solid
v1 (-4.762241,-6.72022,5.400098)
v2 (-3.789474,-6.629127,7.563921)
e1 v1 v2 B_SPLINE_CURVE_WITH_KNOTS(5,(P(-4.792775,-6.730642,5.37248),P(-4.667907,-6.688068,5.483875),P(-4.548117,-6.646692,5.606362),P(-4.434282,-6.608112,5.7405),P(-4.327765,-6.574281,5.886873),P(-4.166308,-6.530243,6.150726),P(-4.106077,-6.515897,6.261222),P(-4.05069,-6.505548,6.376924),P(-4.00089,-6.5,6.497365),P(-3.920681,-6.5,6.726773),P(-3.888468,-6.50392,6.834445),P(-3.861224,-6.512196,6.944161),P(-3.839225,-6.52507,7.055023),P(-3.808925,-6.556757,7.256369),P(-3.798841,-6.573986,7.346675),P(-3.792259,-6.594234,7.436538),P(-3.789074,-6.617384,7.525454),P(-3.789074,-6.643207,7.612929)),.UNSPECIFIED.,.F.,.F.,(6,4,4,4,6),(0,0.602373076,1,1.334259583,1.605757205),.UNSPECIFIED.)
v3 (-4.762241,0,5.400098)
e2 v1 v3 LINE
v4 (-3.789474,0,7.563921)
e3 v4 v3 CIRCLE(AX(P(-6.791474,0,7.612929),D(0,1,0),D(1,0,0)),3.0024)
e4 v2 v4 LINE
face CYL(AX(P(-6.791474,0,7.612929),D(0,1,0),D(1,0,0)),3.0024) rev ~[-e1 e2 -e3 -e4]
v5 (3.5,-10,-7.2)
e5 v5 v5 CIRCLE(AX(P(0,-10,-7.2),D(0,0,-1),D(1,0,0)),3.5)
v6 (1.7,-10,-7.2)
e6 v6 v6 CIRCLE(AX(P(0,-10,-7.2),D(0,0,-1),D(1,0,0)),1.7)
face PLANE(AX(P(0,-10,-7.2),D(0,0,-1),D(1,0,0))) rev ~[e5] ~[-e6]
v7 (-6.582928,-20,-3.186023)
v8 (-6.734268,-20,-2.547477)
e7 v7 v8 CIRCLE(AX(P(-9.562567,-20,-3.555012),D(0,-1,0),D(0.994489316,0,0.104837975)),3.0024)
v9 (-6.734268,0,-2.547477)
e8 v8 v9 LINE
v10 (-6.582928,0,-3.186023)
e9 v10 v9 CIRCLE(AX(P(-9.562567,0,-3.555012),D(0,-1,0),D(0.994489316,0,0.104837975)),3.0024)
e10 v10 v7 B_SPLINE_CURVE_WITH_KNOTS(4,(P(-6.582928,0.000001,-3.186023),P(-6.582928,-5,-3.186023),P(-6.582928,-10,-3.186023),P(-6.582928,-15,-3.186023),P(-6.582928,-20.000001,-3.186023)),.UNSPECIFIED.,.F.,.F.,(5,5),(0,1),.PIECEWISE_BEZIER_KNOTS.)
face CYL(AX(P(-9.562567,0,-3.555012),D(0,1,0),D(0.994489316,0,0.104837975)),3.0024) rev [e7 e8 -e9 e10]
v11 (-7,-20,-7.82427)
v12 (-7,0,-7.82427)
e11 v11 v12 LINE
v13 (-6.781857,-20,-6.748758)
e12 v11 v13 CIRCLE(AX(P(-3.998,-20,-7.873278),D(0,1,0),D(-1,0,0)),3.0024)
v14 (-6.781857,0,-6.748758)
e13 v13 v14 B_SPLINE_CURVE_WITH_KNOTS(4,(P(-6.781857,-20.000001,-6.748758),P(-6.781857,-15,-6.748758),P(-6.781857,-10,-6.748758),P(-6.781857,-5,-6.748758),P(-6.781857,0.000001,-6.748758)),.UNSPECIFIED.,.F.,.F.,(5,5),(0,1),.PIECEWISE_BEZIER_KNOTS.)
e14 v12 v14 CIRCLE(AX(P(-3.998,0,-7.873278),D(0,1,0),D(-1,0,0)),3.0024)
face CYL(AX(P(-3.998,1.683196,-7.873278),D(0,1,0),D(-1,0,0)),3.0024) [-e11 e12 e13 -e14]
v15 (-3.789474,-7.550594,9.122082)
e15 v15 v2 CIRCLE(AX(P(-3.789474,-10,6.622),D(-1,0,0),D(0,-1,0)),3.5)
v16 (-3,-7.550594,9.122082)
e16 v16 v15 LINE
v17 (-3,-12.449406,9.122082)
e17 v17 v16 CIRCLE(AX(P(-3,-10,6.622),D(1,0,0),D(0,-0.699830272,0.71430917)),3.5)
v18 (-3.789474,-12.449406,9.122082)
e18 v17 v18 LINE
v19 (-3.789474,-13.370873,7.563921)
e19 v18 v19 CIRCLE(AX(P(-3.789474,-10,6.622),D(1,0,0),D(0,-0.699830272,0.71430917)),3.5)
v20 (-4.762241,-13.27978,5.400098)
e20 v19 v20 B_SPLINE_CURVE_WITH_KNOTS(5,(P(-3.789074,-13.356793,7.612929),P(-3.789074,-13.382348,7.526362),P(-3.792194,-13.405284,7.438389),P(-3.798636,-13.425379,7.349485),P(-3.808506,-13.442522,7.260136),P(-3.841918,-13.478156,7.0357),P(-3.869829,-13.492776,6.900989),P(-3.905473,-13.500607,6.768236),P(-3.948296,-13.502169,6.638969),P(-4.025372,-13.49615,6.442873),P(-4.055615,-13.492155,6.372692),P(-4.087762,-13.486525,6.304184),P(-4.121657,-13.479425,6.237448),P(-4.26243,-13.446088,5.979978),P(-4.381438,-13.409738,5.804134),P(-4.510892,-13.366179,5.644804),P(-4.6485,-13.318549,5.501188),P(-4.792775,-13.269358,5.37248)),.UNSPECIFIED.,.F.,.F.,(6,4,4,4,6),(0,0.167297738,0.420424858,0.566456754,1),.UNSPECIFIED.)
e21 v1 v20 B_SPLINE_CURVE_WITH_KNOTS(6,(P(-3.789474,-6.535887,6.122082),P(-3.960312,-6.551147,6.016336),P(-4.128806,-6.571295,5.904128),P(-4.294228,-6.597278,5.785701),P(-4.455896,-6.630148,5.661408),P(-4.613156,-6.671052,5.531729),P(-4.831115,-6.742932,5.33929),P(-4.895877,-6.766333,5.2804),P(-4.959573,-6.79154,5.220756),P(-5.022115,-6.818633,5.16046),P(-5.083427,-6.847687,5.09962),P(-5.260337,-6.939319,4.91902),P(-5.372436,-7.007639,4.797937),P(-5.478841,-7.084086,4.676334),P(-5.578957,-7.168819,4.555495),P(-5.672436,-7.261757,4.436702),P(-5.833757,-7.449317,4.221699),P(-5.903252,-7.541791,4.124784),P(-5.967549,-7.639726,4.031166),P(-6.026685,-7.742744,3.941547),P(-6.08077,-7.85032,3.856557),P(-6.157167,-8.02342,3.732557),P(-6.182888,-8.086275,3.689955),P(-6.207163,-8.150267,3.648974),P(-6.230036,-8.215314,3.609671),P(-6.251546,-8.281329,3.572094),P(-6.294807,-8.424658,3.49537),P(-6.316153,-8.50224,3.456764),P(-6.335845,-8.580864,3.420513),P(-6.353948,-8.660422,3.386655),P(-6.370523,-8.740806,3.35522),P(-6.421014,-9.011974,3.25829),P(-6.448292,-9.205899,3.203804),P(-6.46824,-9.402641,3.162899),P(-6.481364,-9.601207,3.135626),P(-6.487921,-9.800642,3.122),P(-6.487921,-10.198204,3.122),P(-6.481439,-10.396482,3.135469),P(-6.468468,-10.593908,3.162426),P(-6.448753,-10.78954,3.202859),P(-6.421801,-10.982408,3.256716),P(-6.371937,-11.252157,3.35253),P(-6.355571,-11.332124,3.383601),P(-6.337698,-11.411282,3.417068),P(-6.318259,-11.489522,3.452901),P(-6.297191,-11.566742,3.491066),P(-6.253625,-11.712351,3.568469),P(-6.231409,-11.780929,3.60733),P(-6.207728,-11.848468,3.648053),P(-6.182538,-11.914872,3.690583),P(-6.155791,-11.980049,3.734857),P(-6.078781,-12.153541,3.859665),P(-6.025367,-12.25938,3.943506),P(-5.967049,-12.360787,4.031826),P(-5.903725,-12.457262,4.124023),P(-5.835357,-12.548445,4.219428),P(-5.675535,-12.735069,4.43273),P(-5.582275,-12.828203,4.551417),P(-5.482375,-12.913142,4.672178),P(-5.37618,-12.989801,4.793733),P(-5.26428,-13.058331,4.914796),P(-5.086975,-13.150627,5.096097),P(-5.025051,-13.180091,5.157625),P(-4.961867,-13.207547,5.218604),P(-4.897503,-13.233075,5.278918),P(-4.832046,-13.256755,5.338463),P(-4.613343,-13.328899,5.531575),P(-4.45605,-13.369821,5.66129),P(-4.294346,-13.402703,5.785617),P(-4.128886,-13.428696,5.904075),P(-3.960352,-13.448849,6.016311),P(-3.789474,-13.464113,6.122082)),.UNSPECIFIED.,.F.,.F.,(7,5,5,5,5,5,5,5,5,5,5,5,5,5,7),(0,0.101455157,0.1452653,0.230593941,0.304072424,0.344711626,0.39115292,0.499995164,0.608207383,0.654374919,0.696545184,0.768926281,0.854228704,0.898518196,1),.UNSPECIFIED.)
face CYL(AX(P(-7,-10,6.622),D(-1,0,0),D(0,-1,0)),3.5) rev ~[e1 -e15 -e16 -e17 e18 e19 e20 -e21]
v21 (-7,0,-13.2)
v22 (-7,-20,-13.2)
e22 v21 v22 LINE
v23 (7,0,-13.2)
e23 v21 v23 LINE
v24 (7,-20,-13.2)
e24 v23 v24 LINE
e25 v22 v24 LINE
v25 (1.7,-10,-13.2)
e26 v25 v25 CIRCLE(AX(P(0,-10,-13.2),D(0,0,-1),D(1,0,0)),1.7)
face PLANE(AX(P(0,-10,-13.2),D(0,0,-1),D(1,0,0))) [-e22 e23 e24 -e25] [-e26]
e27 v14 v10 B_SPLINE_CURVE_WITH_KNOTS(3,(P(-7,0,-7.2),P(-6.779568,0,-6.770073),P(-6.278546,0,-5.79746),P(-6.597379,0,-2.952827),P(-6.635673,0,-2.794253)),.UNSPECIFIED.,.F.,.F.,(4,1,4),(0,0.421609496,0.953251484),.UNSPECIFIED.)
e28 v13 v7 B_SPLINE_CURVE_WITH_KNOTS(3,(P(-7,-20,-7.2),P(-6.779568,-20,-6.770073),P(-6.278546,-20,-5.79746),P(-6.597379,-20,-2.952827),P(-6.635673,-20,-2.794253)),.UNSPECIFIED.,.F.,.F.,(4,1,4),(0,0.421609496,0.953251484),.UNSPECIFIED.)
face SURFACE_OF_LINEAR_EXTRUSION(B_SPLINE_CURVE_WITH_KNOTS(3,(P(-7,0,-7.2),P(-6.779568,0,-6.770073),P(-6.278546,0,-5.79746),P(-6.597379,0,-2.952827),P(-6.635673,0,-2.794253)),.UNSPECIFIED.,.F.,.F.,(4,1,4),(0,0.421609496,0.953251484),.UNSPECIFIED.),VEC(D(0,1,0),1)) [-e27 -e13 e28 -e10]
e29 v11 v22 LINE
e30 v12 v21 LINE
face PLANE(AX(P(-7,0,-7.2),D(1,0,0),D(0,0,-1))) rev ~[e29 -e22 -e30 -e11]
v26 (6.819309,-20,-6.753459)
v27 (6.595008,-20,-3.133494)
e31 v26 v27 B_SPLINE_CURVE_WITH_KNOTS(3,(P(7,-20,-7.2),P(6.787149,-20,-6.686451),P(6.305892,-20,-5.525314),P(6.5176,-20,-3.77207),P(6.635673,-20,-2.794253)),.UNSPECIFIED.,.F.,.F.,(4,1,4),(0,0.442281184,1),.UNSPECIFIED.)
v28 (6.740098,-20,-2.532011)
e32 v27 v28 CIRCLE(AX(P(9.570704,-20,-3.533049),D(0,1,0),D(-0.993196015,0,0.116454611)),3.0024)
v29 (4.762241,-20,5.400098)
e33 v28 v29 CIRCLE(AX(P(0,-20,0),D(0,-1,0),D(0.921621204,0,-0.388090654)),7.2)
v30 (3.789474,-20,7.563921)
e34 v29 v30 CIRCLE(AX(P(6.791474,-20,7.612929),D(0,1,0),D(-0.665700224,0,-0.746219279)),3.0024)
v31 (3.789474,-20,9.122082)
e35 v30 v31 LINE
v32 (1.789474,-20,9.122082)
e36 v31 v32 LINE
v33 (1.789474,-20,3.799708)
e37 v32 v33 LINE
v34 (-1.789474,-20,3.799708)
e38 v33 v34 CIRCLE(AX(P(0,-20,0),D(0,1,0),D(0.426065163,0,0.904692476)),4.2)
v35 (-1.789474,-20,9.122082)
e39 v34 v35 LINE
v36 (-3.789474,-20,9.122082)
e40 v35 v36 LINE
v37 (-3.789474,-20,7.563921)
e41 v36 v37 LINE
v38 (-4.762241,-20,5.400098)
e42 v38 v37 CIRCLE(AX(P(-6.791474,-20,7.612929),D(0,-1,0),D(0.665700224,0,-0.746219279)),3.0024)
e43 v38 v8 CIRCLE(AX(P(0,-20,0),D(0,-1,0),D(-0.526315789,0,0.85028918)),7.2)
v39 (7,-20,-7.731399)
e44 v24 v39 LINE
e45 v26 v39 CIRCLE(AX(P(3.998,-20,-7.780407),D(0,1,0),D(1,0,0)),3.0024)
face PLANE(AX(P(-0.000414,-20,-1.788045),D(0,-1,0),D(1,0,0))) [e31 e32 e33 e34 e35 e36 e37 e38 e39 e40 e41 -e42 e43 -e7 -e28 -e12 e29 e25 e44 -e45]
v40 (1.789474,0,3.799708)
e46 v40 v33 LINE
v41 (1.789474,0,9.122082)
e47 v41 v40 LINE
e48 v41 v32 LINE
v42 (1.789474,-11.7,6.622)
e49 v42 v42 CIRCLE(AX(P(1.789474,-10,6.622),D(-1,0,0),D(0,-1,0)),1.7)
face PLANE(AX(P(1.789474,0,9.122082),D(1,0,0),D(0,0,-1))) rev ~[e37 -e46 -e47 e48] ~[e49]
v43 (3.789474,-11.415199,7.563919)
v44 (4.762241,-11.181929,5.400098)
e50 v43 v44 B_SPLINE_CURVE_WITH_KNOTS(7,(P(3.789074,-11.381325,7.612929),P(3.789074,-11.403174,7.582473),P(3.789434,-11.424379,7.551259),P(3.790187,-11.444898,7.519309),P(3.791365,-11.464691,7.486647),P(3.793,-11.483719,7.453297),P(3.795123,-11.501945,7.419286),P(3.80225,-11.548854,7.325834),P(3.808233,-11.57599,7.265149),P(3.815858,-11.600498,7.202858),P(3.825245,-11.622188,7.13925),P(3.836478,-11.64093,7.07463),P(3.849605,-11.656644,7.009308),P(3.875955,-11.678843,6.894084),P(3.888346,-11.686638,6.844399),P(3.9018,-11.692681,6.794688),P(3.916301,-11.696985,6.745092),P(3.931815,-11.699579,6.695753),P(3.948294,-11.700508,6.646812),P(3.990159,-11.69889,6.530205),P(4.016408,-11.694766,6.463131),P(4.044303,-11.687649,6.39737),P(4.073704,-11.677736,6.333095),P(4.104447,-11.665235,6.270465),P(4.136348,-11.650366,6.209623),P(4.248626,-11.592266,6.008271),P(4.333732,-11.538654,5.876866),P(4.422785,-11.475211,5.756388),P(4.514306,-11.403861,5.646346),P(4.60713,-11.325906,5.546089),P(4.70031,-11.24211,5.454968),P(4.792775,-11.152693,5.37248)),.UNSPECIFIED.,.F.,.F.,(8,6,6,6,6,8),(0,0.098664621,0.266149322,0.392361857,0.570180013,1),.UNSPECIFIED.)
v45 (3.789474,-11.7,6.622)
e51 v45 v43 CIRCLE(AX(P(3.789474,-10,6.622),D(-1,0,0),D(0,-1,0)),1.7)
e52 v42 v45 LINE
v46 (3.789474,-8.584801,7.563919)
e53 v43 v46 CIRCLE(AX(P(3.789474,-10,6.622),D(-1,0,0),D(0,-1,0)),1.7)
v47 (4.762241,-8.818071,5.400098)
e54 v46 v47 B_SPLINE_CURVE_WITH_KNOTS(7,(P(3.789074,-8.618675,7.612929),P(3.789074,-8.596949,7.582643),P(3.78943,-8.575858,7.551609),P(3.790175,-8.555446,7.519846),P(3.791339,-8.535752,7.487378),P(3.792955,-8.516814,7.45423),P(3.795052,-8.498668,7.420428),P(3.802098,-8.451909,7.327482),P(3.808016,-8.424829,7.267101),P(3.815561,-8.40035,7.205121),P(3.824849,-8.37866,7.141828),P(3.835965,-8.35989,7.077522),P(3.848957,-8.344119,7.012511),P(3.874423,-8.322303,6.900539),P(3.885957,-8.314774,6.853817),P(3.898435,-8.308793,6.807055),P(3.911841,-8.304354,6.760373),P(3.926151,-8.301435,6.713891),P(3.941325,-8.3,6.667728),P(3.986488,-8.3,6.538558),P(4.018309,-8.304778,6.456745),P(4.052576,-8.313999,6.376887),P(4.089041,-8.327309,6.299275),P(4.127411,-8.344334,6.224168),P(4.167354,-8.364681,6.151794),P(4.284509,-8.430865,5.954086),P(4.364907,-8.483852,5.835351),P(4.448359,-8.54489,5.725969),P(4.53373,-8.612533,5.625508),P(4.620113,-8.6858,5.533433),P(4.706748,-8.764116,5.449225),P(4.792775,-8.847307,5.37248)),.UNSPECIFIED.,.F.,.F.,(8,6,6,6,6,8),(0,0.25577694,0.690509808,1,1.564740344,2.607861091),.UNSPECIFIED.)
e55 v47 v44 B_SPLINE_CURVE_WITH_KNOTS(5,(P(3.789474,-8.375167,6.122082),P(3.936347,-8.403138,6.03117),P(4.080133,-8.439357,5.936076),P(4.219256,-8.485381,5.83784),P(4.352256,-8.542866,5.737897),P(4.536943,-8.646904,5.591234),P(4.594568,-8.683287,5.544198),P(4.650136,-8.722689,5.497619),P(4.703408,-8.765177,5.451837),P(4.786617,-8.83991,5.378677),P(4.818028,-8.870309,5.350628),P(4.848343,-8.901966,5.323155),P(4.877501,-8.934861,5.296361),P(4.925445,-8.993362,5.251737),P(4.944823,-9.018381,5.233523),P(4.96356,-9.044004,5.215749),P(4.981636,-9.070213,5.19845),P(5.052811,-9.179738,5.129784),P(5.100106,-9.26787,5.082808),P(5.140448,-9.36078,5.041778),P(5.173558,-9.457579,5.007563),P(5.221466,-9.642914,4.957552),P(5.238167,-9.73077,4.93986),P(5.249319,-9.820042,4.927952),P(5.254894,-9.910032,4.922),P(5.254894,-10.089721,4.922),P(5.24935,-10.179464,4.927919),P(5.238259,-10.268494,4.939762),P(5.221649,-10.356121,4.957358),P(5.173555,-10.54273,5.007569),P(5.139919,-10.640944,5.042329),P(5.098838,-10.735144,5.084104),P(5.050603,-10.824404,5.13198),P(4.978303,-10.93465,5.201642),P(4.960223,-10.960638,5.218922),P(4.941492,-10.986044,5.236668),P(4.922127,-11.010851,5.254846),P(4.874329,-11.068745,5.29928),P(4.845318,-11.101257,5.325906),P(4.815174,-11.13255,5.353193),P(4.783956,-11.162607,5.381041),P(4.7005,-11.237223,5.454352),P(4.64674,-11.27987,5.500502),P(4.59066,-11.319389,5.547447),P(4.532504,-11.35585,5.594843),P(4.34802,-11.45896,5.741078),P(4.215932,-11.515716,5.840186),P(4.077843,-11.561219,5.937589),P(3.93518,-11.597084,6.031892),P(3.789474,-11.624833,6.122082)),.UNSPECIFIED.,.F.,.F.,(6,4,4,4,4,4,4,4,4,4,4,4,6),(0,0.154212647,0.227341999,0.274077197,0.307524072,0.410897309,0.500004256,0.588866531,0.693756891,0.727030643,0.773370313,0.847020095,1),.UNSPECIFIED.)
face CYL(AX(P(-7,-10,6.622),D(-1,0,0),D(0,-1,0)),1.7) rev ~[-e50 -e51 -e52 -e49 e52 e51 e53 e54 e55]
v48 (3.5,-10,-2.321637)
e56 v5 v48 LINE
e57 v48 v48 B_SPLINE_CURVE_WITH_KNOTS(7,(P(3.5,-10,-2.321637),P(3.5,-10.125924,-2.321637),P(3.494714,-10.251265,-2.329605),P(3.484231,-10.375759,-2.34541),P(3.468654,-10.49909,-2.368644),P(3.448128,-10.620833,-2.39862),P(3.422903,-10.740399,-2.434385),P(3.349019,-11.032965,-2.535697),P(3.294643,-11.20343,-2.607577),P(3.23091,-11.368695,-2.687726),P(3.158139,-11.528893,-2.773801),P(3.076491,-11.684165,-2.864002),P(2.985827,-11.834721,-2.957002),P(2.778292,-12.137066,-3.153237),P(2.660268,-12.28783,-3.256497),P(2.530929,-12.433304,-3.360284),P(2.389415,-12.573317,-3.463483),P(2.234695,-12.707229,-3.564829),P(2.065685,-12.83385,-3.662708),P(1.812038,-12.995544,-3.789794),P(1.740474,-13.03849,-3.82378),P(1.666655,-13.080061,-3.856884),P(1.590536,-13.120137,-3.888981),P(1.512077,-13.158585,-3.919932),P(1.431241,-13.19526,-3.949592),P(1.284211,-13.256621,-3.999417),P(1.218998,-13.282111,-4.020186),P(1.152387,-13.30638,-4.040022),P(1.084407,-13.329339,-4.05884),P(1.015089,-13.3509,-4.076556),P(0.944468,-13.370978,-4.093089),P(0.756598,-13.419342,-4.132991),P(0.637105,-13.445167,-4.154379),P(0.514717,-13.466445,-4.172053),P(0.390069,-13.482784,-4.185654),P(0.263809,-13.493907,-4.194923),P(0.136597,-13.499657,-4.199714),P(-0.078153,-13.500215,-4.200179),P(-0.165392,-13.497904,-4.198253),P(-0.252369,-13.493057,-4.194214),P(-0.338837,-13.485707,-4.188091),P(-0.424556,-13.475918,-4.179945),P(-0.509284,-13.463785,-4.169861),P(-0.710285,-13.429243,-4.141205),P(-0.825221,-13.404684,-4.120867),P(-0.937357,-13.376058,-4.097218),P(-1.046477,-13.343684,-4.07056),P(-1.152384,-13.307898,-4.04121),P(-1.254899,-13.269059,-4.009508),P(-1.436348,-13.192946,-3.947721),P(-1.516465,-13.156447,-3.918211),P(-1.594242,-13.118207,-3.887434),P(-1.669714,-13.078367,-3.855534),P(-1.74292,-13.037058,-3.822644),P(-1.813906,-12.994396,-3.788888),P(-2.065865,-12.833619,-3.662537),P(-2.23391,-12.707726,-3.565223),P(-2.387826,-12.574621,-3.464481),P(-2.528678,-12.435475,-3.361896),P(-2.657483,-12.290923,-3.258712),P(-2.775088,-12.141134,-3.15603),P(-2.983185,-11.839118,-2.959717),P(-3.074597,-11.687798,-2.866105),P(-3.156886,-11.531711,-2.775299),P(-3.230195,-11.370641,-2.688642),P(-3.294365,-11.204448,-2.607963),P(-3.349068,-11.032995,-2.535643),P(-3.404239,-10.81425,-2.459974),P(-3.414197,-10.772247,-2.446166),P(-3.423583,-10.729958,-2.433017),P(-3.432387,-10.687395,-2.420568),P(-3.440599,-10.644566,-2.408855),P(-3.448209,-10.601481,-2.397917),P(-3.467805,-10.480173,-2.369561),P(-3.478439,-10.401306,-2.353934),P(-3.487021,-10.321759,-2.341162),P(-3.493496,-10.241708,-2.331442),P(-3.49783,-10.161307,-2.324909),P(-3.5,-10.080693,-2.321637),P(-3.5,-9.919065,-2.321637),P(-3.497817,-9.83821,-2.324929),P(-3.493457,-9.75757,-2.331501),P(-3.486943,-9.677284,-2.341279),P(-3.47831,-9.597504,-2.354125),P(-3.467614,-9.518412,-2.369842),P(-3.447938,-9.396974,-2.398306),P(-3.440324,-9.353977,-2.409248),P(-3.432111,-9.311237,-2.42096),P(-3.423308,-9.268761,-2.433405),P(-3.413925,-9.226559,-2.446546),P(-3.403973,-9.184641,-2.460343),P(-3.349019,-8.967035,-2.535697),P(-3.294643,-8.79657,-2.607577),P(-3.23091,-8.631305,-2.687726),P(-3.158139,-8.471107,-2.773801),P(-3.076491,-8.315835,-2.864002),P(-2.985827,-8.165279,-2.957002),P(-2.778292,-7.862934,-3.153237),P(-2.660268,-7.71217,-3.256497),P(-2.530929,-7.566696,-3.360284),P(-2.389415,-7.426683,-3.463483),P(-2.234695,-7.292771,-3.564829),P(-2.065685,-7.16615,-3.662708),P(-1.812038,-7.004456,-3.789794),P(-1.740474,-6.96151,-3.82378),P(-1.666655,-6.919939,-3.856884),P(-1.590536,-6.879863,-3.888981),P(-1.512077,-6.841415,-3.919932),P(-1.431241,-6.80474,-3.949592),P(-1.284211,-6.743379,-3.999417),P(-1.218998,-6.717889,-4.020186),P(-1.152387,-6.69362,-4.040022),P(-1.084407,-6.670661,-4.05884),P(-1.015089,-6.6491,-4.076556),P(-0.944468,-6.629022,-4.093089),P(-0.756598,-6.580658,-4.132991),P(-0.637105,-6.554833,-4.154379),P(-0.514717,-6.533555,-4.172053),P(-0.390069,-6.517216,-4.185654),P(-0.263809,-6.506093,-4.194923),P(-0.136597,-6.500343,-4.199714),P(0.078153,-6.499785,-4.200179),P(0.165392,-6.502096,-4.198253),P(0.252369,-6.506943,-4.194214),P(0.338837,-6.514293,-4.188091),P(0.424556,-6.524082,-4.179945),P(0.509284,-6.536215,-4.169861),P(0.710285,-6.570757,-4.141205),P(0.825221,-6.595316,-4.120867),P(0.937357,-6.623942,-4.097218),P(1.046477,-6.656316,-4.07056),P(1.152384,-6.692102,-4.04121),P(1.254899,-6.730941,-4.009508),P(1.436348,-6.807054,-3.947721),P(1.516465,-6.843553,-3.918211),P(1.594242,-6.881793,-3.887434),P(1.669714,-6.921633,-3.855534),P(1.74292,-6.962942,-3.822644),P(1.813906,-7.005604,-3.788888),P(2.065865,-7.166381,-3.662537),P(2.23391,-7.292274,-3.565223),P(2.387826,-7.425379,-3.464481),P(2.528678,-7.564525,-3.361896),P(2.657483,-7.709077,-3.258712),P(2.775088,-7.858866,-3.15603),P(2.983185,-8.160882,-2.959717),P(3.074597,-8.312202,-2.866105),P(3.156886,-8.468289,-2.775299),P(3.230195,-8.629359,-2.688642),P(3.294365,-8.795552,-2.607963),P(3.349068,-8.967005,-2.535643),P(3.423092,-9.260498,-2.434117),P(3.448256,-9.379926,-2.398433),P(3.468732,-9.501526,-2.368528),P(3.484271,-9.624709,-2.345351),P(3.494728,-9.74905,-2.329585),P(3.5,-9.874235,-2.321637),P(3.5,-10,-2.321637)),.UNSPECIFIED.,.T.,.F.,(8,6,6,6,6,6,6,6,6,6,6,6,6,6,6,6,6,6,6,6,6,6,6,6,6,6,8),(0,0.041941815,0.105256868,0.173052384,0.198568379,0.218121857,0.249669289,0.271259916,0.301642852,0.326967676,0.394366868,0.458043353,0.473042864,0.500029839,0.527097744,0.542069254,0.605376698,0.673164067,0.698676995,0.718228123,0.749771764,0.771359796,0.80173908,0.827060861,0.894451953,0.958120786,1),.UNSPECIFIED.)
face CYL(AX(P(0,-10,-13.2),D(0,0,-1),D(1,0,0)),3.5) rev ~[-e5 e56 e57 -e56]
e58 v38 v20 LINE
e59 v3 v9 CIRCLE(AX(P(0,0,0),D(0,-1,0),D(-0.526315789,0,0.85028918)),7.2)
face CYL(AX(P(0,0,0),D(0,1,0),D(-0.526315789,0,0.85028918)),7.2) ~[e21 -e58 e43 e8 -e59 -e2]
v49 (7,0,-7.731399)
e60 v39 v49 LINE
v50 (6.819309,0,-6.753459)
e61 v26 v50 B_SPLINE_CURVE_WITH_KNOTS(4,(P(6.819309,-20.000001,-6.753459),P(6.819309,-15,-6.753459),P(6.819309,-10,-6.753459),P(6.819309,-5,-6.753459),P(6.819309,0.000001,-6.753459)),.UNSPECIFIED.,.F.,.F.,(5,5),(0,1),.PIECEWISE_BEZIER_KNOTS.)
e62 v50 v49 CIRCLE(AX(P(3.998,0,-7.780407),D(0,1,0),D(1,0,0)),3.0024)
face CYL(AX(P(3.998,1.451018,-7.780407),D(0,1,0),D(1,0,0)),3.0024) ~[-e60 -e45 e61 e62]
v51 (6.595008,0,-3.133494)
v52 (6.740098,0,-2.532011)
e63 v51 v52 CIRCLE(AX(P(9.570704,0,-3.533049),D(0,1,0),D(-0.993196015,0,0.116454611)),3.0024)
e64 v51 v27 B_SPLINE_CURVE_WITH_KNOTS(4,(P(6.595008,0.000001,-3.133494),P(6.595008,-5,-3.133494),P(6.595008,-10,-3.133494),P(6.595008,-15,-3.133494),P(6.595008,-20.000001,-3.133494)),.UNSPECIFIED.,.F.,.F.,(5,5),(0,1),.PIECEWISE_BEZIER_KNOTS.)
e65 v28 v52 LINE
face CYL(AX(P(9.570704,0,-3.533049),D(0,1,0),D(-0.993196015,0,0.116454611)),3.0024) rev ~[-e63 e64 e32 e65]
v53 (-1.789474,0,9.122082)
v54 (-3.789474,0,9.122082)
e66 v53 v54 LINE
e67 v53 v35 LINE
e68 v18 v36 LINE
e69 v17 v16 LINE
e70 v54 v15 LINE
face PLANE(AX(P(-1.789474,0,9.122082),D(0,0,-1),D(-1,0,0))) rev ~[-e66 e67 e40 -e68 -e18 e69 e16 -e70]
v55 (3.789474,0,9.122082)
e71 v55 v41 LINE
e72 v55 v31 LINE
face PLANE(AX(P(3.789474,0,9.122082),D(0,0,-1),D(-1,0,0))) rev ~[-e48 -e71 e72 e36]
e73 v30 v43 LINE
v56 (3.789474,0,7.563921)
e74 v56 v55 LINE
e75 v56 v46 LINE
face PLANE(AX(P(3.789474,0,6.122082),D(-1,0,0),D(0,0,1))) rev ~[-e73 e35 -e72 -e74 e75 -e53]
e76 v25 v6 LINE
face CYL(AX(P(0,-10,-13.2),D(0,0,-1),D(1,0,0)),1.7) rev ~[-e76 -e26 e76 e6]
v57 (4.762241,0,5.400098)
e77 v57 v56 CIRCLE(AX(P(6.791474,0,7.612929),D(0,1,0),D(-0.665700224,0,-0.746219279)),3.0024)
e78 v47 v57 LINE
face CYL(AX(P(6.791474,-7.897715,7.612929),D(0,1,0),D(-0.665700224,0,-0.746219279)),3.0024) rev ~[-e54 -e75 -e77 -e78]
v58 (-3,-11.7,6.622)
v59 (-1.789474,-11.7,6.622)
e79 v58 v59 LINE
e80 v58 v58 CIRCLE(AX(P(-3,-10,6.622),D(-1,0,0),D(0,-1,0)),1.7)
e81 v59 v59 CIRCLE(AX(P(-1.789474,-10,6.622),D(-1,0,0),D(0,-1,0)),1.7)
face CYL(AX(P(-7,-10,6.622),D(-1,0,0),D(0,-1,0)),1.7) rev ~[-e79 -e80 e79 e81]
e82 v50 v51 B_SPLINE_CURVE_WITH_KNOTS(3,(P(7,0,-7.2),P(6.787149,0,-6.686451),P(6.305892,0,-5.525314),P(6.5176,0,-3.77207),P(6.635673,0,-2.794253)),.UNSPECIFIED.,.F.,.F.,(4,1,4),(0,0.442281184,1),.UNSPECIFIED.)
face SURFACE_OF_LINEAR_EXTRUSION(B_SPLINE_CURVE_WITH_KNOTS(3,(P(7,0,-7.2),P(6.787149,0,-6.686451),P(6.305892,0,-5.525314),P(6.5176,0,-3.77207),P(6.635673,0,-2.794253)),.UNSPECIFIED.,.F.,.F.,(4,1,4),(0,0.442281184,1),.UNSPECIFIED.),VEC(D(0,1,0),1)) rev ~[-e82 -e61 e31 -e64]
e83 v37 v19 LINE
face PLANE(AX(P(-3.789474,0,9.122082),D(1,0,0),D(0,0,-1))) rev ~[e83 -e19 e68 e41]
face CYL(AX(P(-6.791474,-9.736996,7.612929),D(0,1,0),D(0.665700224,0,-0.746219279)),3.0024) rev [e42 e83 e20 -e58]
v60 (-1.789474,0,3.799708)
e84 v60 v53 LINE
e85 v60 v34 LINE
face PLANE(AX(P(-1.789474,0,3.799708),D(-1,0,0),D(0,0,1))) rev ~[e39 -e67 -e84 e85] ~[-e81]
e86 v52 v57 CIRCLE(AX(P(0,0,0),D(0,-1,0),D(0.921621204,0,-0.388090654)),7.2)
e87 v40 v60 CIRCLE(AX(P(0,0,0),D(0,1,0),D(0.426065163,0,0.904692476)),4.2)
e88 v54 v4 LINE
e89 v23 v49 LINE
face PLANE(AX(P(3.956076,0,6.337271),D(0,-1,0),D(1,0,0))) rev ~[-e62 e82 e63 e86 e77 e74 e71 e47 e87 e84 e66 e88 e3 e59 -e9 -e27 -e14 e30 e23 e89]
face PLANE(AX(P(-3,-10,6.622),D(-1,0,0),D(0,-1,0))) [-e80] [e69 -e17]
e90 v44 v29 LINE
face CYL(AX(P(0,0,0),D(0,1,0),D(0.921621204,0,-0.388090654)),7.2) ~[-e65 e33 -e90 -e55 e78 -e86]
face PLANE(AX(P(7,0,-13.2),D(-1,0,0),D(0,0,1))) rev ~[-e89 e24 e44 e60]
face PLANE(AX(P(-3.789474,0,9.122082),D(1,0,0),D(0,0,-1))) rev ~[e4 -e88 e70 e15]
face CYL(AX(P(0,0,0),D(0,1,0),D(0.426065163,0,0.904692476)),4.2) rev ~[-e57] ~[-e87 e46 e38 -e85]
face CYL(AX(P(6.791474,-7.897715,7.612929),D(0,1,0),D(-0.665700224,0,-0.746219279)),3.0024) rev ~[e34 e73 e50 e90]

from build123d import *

# Parameters (mm, degrees)
F1_DEPTH     = 20
F2_R         = 3.5
F2_R_2       = 1.7
F3_DEPTH     = 4
F4_DEPTH     = 25
F5_T1_DEPTH  = 20
F5_T6_DEPTH  = 12.1022846539
F5_S7_R      = 1.7
F5_T8_DEPTH  = 8
F5_T12_DEPTH = 12.1022846539
F5_S13_R     = 1.7
F5_T14_DEPTH = 8
F5_T18_DEPTH = 10.2630041323
F5_S19_R     = 3.5
F5_T20_DEPTH = 7
F5_T24_DEPTH = 10.2630041323
F5_S25_R     = 3.5
F5_T26_DEPTH = 7
F5_T27_DEPTH = 23.3663915102
F5_T29_DEPTH = 22.9020360067
F6_R         = 3.5
F6_R_2       = 1.7
F7_DEPTH     = 12
F8_DEPTH     = 12
F9_DEPTH     = 6


# Not quite as in the source:
# - a fillet or chamfer that OpenCascade refuses, or shapes differently, is made with other operations: its cross-section is extruded or revolved along the edge and cut away or added


with BuildPart() as f1:
    # F0 (on Front) → F1 (new body)
    with BuildSketch(Plane.XZ):
        with BuildLine():
            ThreePointArc((1.7894736842, 3.7997084011), (0, -4.2), (-1.7894736842, 3.7997084011))
            Line((-1.7894736842, 3.7997084011), (-1.7894736842, 9.1220820965))
            Line((-1.7894736842, 9.1220820965), (-3.7894736842, 9.1220820965))
            Line((-3.7894736842, 9.1220820965), (-3.7894736842, 6.1220820965))
            ThreePointArc((-3.7894736842, 6.1220820965), (-6.8557776995, 2.199616361), (-6.6439040907, -2.7746240166))
            add(Edge.make_bspline(
                [(-6.6356726702, -2.7942527112), (-6.6390399212, -2.7803089062), (-6.6413283577, -2.7774058988), (-6.6439040907, -2.7746240166)],
                knots=[0.9532514843, 0.9532514843, 0.9532514843, 0.9532514843, 1, 1, 1, 1], degree=3))
            add(Edge.make_bspline(
                [(-7, -7.2), (-6.7795680226, -6.7700727801), (-6.2785456929, -5.7974600377), (-6.5973790049, -2.9528269921), (-6.6356726702, -2.7942527112)],
                knots=[0, 0, 0, 0, 0.4216094964, 0.9532514843, 0.9532514843, 0.9532514843, 0.9532514843], degree=3))
            Line((-7, -7.2), (-7, -13.2))
            Line((-7, -13.2), (7, -13.2))
            Line((7, -13.2), (7, -7.2))
            add(Edge.make_bspline(
                [(7, -7.2), (6.7871491537, -6.6864508711), (6.3058923114, -5.5253136877), (6.5175995563, -3.7720698099), (6.6356726702, -2.7942527112)],
                knots=[0, 0, 0, 0, 0.4422811845, 1, 1, 1, 1], degree=3))
            ThreePointArc((6.6356726702, -2.7942527112), (6.8590214848, 2.1894803656), (3.7894736842, 6.1220820965))
            Line((3.7894736842, 6.1220820965), (3.7894736842, 9.1220820965))
            Line((3.7894736842, 9.1220820965), (1.7894736842, 9.1220820965))
            Line((1.7894736842, 9.1220820965), (1.7894736842, 3.7997084011))
        make_face()
        with BuildLine():
            add(Edge.make_bspline(
                [(-6.6356726702, -2.7942527112), (-6.6390399212, -2.7803089062), (-6.6413283577, -2.7774058988), (-6.6439040907, -2.7746240166)],
                knots=[0.9532514843, 0.9532514843, 0.9532514843, 0.9532514843, 1, 1, 1, 1], degree=3))
            ThreePointArc((-6.6439040907, -2.7746240166), (-6.6397956338, -2.7844414056), (-6.6356726702, -2.7942527112))
        make_face()
    extrude(amount=F1_DEPTH)

    # F2 (on face) → F3 (cut)
    with BuildSketch(Plane(origin=(-7, 0, 0), x_dir=(0, -1, 0), z_dir=(-1, 0, 0))):
        with Locations((10, 6.622)):
            Circle(F2_R)
        with Locations((10, 6.622)):
            Circle(F2_R_2, mode=Mode.SUBTRACT)
    extrude(amount=-F3_DEPTH, mode=Mode.SUBTRACT)

    # F2 (on face) → F4 (cut)
    with BuildSketch(Plane(origin=(-7, 0, 0), x_dir=(0, -1, 0), z_dir=(-1, 0, 0))):
        with Locations((10, 6.622)):
            Circle(F2_R_2)
    extrude(amount=-F4_DEPTH, mode=Mode.SUBTRACT)

    # F5: fillet of radius 3 on 8 edges, made by hand

    # F5_s2 → F5_t1 (join)
    with BuildSketch(Plane.XZ):
        with BuildLine():
            ThreePointArc((-6.5767127025, -3.2402461743), (-6.6395606645, -2.8691274316), (-6.7483493849, -2.5087886996))
            Line((-6.7483493849, -2.5087886996), (-6.466927581, -2.4041663985))
            ThreePointArc((-6.466927581, -2.4041663985), (-6.4145893512, -2.5416001874), (-6.3589651198, -2.6777323732))
            Line((-6.3589651198, -2.6777323732), (-6.343821894, -2.723774473))
            ThreePointArc((-6.343821894, -2.723774473), (-6.304537605, -2.9799785061), (-6.2781272304, -3.2087696206))
            Line((-6.2781272304, -3.2087696206), (-6.5767127025, -3.2402461743))
        make_face()
        with BuildLine():
            ThreePointArc((6.5887317904, -3.1834061265), (6.6509501418, -2.8334452349), (6.754091056, -2.4932898281))
            Line((6.754091056, -2.4932898281), (6.4724298111, -2.3893138658))
            ThreePointArc((6.4724298111, -2.3893138658), (6.4175024363, -2.534235691), (6.3589651198, -2.6777323732))
            Line((6.3589651198, -2.6777323732), (6.3375979172, -2.7582596669))
            ThreePointArc((6.3375979172, -2.7582596669), (6.3141276632, -2.9530960278), (6.290534619, -3.1484417941))
            Line((6.290534619, -3.1484417941), (6.5887317904, -3.1834061265))
        make_face()
    extrude(amount=F5_T1_DEPTH)


with BuildPart() as f5_tool4:
    # F5_s5 → F5_t6 (new body)
    with BuildSketch(Plane.XZ.offset(7.8977153461)):
        with BuildLine():
            ThreePointArc((4.792775332, 5.3724803189), (4.0514647707, 6.385428811), (3.7890736842, 7.6129290813))
            Line((3.7890736842, 7.6129290813), (3.4888336842, 7.6129290813))
            ThreePointArc((3.4888336842, 7.6129290813), (3.4892336842, 6.8675055889), (3.4892336842, 6.1220820965))
            Line((3.4892336842, 6.1220820965), (3.6314526316, 5.8667912731))
            ThreePointArc((3.6314526316, 5.8667912731), (4.1279416848, 5.5287236777), (4.5929054968, 5.1484354427))
            Line((4.5929054968, 5.1484354427), (4.792775332, 5.3724803189))
        make_face()
    extrude(amount=F5_T6_DEPTH)

    # F5_s7 → F5_t8 (cut, symmetric)
    with BuildSketch(Plane.YZ.offset(4.1)):
        with Locations((-10, 6.622)):
            Circle(F5_S7_R)
    extrude(amount=F5_T8_DEPTH, both=True, mode=Mode.SUBTRACT)


with BuildPart() as f1_1:
    add(f1.part)

    # F5_t3: union F5_tool4
    add(f5_tool4.part)


with BuildPart() as f5_tool10:
    # F5_s11 → F5_t12 (new body)
    with BuildSketch(Plane.XZ):
        with BuildLine():
            ThreePointArc((4.792775332, 5.3724803189), (4.0514647707, 6.385428811), (3.7890736842, 7.6129290813))
            Line((3.7890736842, 7.6129290813), (3.4888336842, 7.6129290813))
            ThreePointArc((3.4888336842, 7.6129290813), (3.4892336842, 6.8675055889), (3.4892336842, 6.1220820965))
            Line((3.4892336842, 6.1220820965), (3.6314526316, 5.8667912731))
            ThreePointArc((3.6314526316, 5.8667912731), (4.1279416848, 5.5287236777), (4.5929054968, 5.1484354427))
            Line((4.5929054968, 5.1484354427), (4.792775332, 5.3724803189))
        make_face()
    extrude(amount=F5_T12_DEPTH)

    # F5_s13 → F5_t14 (cut, symmetric)
    with BuildSketch(Plane.YZ.offset(4.1)):
        with Locations((-10, 6.622)):
            Circle(F5_S13_R)
    extrude(amount=F5_T14_DEPTH, both=True, mode=Mode.SUBTRACT)


with BuildPart() as f1_2:
    add(f1_1.part)

    # F5_t9: union F5_tool10
    add(f5_tool10.part)


with BuildPart() as f5_tool16:
    # F5_s17 → F5_t18 (new body)
    with BuildSketch(Plane.XZ):
        with BuildLine():
            ThreePointArc((-3.7890736842, 7.6129290813), (-4.0514647707, 6.385428811), (-4.792775332, 5.3724803189))
            Line((-4.792775332, 5.3724803189), (-4.5929054968, 5.1484354427))
            ThreePointArc((-4.5929054968, 5.1484354427), (-4.1279416848, 5.5287236777), (-3.6314526316, 5.8667912731))
            Line((-3.6314526316, 5.8667912731), (-3.4892336842, 6.1220820965))
            ThreePointArc((-3.4892336842, 6.1220820965), (-3.4892336842, 6.8675055889), (-3.4888336842, 7.6129290813))
            Line((-3.4888336842, 7.6129290813), (-3.7890736842, 7.6129290813))
        make_face()
    extrude(amount=F5_T18_DEPTH)

    # F5_s19 → F5_t20 (cut, symmetric)
    with BuildSketch(Plane.YZ.offset(-4.1)):
        with Locations((-10, 6.622)):
            Circle(F5_S19_R)
    extrude(amount=F5_T20_DEPTH, both=True, mode=Mode.SUBTRACT)


with BuildPart() as f1_3:
    add(f1_2.part)

    # F5_t15: union F5_tool16
    add(f5_tool16.part)


with BuildPart() as f5_tool22:
    # F5_s23 → F5_t24 (new body)
    with BuildSketch(Plane.XZ.offset(9.7369958677)):
        with BuildLine():
            ThreePointArc((-4.792775332, 5.3724803189), (-4.0514647707, 6.385428811), (-3.7890736842, 7.6129290813))
            Line((-3.7890736842, 7.6129290813), (-3.4888336842, 7.6129290813))
            ThreePointArc((-3.4888336842, 7.6129290813), (-3.4892336842, 6.8675055889), (-3.4892336842, 6.1220820965))
            Line((-3.4892336842, 6.1220820965), (-3.6314526316, 5.8667912731))
            ThreePointArc((-3.6314526316, 5.8667912731), (-4.1279416848, 5.5287236777), (-4.5929054968, 5.1484354427))
            Line((-4.5929054968, 5.1484354427), (-4.792775332, 5.3724803189))
        make_face()
    extrude(amount=F5_T24_DEPTH)

    # F5_s25 → F5_t26 (cut, symmetric)
    with BuildSketch(Plane.YZ.offset(-4.1)):
        with Locations((-10, 6.622)):
            Circle(F5_S25_R)
    extrude(amount=F5_T26_DEPTH, both=True, mode=Mode.SUBTRACT)


with BuildPart() as f1_4:
    add(f1_3.part)

    # F5_t21: union F5_tool22
    add(f5_tool22.part)

    # F5_s28 → F5_t27 (cut)
    with BuildSketch(Plane.XZ.offset(-1.6831957551)):
        with BuildLine():
            ThreePointArc((-7.0004, -7.8732781832), (-6.9416848839, -7.2824101234), (-6.7678360085, -6.7146521667))
            Line((-6.7678360085, -6.7146521667), (-7.0448196093, -6.5987895651))
            ThreePointArc((-7.0448196093, -6.5987895651), (-7.148871707, -6.8283644641), (-7.2671697753, -7.0630169034))
            Line((-7.2671697753, -7.0630169034), (-7.30024, -7.2))
            ThreePointArc((-7.30024, -7.2), (-7.30024, -7.5366390916), (-7.30064, -7.8732781832))
            Line((-7.30064, -7.8732781832), (-7.0004, -7.8732781832))
        make_face()
    extrude(amount=F5_T27_DEPTH, mode=Mode.SUBTRACT)

    # F5_s30 → F5_t29 (cut)
    with BuildSketch(Plane.XZ.offset(-1.4510180034)):
        with BuildLine():
            ThreePointArc((7.0004, -7.7804070635), (6.9510099307, -7.2380620544), (6.8044646756, -6.7135604089))
            Line((6.8044646756, -6.7135604089), (7.0851111432, -6.6068757434))
            ThreePointArc((7.0851111432, -6.6068757434), (7.178454263, -6.8447161783), (7.277360411, -7.0850423555))
            Line((7.277360411, -7.0850423555), (7.30024, -7.2))
            ThreePointArc((7.30024, -7.2), (7.30024, -7.4902035318), (7.30064, -7.7804070635))
            Line((7.30064, -7.7804070635), (7.0004, -7.7804070635))
        make_face()
    extrude(amount=F5_T29_DEPTH, mode=Mode.SUBTRACT)

    # F6 (on face) → F7 (cut)
    with BuildSketch(Plane(origin=(0, 0, -13.2), x_dir=(1, 0, 0), z_dir=(0, 0, -1))):
        with Locations((0, 10)):
            Circle(F6_R)
        with Locations((0, 10)):
            Circle(F6_R_2, mode=Mode.SUBTRACT)
    extrude(amount=-F7_DEPTH, mode=Mode.SUBTRACT)

    # F8 (cut): a face of the model
    f8_faces = [f1_4.faces().sort_by_distance(p)[0] for p in [
        (0, -10, -13.2),
    ]]
    extrude(f8_faces, amount=-F8_DEPTH, mode=Mode.SUBTRACT)

    # F6 (on face) → F9 (join)
    with BuildSketch(Plane(origin=(0, 0, -13.2), x_dir=(1, 0, 0), z_dir=(0, 0, -1))):
        with Locations((0, 10)):
            Circle(F6_R)
        with Locations((0, 10)):
            Circle(F6_R_2, mode=Mode.SUBTRACT)
    extrude(amount=-F9_DEPTH)


solid = f1_4.part
